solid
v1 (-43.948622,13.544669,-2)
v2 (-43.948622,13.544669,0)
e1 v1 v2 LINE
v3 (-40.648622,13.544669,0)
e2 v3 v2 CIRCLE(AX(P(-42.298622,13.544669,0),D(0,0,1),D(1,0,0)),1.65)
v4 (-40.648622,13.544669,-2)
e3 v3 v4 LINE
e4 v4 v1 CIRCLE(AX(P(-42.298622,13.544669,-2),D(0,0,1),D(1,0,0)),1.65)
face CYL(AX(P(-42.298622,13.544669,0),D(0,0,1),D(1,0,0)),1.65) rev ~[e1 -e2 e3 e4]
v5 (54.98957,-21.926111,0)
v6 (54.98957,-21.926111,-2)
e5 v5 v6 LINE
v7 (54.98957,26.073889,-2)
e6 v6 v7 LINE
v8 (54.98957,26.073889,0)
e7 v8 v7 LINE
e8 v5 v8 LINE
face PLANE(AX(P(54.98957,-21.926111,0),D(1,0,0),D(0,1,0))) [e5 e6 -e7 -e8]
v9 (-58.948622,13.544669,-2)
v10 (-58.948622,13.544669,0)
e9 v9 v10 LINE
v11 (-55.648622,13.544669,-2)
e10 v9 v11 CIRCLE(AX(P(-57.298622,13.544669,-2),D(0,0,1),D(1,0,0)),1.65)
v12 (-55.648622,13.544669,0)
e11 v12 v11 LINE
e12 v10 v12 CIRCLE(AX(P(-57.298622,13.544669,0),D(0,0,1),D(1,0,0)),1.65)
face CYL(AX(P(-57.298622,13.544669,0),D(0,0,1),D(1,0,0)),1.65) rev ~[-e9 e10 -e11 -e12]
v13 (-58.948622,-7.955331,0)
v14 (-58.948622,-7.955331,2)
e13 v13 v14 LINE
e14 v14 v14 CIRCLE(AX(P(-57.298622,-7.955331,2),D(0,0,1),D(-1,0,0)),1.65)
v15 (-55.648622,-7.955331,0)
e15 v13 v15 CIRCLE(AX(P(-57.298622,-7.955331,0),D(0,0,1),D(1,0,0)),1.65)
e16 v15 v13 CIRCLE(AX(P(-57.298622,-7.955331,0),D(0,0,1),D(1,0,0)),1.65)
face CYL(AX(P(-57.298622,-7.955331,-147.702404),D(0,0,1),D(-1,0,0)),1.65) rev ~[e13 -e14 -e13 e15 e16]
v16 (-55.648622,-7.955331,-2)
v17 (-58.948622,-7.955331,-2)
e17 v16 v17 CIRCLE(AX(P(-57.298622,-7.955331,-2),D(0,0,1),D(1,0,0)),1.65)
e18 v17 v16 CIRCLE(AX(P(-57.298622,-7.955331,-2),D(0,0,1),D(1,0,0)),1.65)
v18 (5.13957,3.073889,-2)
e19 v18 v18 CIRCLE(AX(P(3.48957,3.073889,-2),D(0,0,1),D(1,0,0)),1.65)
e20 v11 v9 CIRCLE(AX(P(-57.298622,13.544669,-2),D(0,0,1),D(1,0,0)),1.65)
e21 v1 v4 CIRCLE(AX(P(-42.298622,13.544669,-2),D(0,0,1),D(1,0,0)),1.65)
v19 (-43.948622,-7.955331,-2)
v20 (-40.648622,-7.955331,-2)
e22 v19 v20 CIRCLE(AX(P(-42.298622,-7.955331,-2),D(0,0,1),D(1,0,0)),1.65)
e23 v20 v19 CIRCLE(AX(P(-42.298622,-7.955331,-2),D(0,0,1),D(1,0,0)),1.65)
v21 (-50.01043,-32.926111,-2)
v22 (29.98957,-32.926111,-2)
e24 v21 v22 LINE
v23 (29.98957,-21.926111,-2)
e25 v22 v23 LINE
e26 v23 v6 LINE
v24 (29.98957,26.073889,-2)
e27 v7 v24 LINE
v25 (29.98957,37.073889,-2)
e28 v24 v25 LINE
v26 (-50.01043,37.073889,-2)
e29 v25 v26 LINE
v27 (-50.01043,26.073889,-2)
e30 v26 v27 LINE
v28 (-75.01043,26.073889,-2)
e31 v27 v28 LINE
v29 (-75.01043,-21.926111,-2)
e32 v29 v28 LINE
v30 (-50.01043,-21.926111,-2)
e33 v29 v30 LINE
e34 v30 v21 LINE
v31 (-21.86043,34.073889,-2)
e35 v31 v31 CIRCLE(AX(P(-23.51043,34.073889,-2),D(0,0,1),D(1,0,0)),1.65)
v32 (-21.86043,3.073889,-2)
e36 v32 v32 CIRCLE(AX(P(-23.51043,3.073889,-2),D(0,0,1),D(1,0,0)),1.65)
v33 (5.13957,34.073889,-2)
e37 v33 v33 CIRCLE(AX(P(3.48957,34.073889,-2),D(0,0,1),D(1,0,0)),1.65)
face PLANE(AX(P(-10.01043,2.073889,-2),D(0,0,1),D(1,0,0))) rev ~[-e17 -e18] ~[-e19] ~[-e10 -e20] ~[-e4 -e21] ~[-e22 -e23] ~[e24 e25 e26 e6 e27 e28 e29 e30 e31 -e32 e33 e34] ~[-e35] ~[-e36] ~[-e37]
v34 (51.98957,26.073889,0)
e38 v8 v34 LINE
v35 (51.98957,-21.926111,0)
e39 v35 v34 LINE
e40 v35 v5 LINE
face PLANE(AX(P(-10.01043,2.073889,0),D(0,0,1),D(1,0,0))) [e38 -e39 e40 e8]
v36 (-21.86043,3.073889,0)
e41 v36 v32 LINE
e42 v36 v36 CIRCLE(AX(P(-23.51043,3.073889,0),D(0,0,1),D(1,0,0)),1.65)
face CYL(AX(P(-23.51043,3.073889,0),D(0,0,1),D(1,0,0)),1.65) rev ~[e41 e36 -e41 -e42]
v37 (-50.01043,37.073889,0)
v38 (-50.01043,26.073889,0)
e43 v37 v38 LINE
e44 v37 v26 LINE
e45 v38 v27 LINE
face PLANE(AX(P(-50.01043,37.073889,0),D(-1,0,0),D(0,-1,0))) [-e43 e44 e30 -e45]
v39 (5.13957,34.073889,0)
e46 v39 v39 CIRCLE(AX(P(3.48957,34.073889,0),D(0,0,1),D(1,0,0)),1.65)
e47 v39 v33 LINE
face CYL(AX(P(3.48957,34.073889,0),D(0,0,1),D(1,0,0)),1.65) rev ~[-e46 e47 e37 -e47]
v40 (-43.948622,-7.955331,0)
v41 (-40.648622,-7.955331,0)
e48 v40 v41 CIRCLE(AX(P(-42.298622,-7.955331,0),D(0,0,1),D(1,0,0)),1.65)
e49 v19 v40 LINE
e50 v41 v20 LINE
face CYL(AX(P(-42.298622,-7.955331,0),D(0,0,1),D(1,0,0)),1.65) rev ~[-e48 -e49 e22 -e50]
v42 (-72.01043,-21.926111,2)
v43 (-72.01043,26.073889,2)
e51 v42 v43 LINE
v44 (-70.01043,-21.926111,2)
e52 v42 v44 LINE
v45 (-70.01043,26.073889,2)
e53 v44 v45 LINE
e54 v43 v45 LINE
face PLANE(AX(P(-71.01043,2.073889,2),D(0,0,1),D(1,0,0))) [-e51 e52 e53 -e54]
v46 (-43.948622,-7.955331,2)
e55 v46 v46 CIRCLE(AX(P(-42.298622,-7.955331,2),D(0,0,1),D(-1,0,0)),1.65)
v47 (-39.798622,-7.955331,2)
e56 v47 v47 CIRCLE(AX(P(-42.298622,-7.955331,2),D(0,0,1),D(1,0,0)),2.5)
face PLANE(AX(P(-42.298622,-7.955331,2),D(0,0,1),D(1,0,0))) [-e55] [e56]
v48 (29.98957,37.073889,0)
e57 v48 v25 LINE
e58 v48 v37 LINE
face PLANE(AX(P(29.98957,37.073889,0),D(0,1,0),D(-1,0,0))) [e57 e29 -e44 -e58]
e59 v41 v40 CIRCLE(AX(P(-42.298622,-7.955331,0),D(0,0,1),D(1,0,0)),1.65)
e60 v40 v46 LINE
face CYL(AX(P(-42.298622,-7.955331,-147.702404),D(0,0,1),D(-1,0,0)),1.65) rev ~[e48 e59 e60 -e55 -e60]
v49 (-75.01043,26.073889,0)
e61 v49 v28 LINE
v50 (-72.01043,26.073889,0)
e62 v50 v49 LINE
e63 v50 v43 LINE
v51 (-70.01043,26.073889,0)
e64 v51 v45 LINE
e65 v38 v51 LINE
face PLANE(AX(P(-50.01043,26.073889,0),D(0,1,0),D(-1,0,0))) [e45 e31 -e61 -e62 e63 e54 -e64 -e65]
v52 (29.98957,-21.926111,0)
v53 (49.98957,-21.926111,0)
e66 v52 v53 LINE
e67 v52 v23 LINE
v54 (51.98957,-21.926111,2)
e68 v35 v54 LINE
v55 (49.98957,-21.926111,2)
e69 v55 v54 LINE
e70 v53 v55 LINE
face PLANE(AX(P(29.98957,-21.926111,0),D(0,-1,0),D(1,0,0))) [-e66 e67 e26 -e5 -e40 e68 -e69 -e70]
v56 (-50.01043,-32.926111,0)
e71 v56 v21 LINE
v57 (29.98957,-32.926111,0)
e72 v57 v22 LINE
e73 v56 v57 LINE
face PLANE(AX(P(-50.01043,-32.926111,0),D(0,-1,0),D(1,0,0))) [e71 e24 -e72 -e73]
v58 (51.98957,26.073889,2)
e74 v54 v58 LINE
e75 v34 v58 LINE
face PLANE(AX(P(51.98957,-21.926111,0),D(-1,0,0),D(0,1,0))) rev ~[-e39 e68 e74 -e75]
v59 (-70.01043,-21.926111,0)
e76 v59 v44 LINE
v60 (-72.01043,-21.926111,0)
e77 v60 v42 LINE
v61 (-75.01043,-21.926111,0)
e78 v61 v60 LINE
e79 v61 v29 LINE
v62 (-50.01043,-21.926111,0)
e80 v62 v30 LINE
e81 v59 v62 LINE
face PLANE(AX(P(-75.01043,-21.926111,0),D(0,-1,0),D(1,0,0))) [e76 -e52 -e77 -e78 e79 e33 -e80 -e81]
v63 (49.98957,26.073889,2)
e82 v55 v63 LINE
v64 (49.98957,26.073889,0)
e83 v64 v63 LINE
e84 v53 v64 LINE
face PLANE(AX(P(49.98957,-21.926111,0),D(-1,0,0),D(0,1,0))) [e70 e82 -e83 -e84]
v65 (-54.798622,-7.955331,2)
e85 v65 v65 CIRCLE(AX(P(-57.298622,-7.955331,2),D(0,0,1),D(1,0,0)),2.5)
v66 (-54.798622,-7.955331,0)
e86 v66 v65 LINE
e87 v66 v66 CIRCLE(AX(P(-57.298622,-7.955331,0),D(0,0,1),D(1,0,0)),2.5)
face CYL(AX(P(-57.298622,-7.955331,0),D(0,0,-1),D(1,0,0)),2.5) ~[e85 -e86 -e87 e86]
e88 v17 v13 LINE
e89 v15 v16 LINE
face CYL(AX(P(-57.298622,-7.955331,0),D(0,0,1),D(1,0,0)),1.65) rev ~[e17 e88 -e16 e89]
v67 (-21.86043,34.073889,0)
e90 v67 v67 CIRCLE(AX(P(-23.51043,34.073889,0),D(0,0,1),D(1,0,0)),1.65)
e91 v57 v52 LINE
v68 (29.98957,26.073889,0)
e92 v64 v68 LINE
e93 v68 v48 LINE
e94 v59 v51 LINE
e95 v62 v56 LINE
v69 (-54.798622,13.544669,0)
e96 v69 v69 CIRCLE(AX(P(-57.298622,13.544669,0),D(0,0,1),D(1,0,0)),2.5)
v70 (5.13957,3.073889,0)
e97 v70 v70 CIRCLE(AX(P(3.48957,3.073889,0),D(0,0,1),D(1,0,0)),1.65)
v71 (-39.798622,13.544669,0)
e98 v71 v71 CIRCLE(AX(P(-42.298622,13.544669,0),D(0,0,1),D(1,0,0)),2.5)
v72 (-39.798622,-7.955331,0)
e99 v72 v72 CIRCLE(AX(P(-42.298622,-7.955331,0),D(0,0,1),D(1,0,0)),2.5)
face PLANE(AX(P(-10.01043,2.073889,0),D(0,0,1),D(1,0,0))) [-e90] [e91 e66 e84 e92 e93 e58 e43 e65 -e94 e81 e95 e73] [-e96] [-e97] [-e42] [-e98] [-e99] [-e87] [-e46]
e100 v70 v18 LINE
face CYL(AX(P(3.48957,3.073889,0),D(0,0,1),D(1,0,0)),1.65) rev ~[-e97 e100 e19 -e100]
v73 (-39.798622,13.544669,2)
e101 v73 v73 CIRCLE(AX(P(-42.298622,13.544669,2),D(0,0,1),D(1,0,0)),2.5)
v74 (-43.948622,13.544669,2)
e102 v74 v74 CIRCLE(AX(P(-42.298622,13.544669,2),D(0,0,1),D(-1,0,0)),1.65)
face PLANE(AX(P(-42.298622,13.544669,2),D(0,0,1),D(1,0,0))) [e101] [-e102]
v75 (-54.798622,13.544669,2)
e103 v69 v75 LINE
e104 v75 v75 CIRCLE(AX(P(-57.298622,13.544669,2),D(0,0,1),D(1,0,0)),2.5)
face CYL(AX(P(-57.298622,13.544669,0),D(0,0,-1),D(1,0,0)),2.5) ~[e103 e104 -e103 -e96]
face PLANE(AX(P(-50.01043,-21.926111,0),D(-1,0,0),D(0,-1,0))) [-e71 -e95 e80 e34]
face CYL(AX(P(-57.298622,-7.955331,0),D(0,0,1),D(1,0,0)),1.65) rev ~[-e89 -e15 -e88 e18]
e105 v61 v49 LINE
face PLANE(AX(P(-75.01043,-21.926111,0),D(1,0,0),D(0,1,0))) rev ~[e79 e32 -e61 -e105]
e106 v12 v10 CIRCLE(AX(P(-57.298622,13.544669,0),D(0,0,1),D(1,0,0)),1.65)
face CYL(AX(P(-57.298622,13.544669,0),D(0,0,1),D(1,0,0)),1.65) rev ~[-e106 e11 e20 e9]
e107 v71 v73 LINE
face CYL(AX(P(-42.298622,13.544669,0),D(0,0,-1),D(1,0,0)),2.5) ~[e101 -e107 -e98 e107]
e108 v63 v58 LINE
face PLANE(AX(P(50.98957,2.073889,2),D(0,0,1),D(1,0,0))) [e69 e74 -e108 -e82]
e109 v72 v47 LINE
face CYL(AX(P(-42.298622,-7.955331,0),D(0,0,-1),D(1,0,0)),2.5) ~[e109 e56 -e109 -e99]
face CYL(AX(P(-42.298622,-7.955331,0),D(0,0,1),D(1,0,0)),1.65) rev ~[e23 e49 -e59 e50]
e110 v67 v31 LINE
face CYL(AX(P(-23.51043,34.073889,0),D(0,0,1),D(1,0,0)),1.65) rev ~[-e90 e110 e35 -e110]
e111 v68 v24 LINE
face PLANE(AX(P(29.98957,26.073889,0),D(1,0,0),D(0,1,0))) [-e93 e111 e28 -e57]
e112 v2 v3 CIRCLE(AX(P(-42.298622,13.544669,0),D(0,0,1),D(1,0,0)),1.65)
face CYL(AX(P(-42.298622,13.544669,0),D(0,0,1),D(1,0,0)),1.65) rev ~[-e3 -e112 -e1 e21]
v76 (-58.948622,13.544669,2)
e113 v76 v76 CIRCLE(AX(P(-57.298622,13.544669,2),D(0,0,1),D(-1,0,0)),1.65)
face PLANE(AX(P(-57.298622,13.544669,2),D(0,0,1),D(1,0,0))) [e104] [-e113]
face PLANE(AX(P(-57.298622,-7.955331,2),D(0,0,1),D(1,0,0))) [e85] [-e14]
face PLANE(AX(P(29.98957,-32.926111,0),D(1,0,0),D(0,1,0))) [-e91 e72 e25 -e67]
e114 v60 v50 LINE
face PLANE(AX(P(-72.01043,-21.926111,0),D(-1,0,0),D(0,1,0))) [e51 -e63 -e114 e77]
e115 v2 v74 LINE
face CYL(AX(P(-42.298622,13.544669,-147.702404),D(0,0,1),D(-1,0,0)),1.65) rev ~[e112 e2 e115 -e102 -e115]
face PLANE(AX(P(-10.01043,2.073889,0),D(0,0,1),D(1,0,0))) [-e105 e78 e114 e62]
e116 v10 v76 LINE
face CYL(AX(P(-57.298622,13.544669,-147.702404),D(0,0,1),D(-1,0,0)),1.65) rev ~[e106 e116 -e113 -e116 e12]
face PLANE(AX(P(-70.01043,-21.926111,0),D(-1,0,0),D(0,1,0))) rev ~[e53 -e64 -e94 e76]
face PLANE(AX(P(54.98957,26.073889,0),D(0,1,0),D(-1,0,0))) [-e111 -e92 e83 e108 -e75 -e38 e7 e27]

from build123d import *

# Parameters (mm, degrees)
F0_R     = 2.5
F0_W     = 20
F0_H     = 48
F0_W_2   = 3
F0_W_3   = 2
F1_DEPTH = 2
F2_DEPTH = 2
F3_D     = 3.3
F3_DEPTH = 2.001
F4_D     = 3.3


# Not quite as in the source:
# - a feature names something its author has since deleted; it is built from what else it names


with BuildPart() as f1:
    # F0 (on Top) → F1 (new body)
    with BuildSketch(Plane.XY):
        Polygon((-17.7864517868, 26.073888598), (-50.0104304813, 26.073888598), (-50.0104304813, -21.926111402), (-17.7864517868, -21.926111402), (19.2135482132, -21.926111402), (29.9895695187, -21.926111402), (29.9895695187, 26.073888598), (19.2135482132, 26.073888598), align=None)
        with Locations((-42.2986224294, -7.9553306252)):
            Circle(F0_R, mode=Mode.SUBTRACT)
        with Locations((-42.2986224294, 13.5446693748)):
            Circle(F0_R, mode=Mode.SUBTRACT)
        Polygon((-50.0104304813, -21.926111402), (-50.0104304813, 26.073888598), (-54.2864517868, 26.073888598), (-70.0104304813, 26.073888598), (-70.0104304813, -21.926111402), (-54.2864517868, -21.926111402), align=None)
        with Locations((-57.2986224294, -7.9553306252)):
            Circle(F0_R, mode=Mode.SUBTRACT)
        with Locations((-57.2986224294, 13.5446693748)):
            Circle(F0_R, mode=Mode.SUBTRACT)
        with Locations((39.9895695187, 2.073888598)):
            Rectangle(F0_W, F0_H)
        Polygon((29.9895695187, 37.073888598), (-50.0104304813, 37.073888598), (-50.0104304813, 26.073888598), (-17.7864517868, 26.073888598), (19.2135482132, 26.073888598), (29.9895695187, 26.073888598), align=None)
        Polygon((-17.7864517868, -21.926111402), (-50.0104304813, -21.926111402), (-50.0104304813, -32.926111402), (29.9895695187, -32.926111402), (29.9895695187, -21.926111402), (19.2135482132, -21.926111402), align=None)
        with Locations((-73.5104304813, 2.073888598)):
            Rectangle(F0_W_2, F0_H)
        with Locations((53.4895695187, 2.073888598)):
            Rectangle(F0_W_2, F0_H)
        with Locations((-71.0104304813, 2.073888598)):
            Rectangle(F0_W_3, F0_H)
        with Locations((50.9895695187, 2.073888598)):
            Rectangle(F0_W_3, F0_H)
        with Locations((-42.2986224294, 13.5446693748)):
            Circle(F0_R)
        with Locations((-42.2986224294, -7.9553306252)):
            Circle(F0_R)
        with Locations((-57.2986224294, -7.9553306252)):
            Circle(F0_R)
        with Locations((-57.2986224294, 13.5446693748)):
            Circle(F0_R)
    extrude(amount=-F1_DEPTH)

    # F0 (on Top) → F2 (join)
    with BuildSketch(Plane.XY):
        with Locations((-71.0104304813, 2.073888598)):
            Rectangle(F0_W_3, F0_H)
        with Locations((50.9895695187, 2.073888598)):
            Rectangle(F0_W_3, F0_H)
        with Locations((-57.2986224294, 13.5446693748)):
            Circle(F0_R)
        with Locations((-42.2986224294, 13.5446693748)):
            Circle(F0_R)
        with Locations((-42.2986224294, -7.9553306252)):
            Circle(F0_R)
        with Locations((-57.2986224294, -7.9553306252)):
            Circle(F0_R)
    extrude(amount=F2_DEPTH)

    # F3 (through all, one way)
    with BuildSketch(Plane.XY):
        with Locations((-23.5104304813, 3.073888598), (3.4895695187, 3.073888598), (3.4895695187, 34.073888598), (-23.5104304813, 34.073888598), (-57.2986224294, 13.5446693748), (-42.2986224294, 13.5446693748), (-42.2986224294, -7.9553306252), (-57.2986224294, -7.9553306252)):
            Circle(F3_D / 2)
    extrude(amount=-F3_DEPTH, mode=Mode.SUBTRACT)

    # F4 (through all)
    with Locations(Plane(origin=(0, 0, 0), x_dir=(1, 0, 0), z_dir=(0, 0, -1))):
        with Locations((-57.2986224294, -13.5446693748), (-57.2986224294, 7.9553306252), (-42.2986224294, -13.5446693748), (-42.2986224294, 7.9553306252)):
            Hole(F4_D / 2)


solid = f1.part
